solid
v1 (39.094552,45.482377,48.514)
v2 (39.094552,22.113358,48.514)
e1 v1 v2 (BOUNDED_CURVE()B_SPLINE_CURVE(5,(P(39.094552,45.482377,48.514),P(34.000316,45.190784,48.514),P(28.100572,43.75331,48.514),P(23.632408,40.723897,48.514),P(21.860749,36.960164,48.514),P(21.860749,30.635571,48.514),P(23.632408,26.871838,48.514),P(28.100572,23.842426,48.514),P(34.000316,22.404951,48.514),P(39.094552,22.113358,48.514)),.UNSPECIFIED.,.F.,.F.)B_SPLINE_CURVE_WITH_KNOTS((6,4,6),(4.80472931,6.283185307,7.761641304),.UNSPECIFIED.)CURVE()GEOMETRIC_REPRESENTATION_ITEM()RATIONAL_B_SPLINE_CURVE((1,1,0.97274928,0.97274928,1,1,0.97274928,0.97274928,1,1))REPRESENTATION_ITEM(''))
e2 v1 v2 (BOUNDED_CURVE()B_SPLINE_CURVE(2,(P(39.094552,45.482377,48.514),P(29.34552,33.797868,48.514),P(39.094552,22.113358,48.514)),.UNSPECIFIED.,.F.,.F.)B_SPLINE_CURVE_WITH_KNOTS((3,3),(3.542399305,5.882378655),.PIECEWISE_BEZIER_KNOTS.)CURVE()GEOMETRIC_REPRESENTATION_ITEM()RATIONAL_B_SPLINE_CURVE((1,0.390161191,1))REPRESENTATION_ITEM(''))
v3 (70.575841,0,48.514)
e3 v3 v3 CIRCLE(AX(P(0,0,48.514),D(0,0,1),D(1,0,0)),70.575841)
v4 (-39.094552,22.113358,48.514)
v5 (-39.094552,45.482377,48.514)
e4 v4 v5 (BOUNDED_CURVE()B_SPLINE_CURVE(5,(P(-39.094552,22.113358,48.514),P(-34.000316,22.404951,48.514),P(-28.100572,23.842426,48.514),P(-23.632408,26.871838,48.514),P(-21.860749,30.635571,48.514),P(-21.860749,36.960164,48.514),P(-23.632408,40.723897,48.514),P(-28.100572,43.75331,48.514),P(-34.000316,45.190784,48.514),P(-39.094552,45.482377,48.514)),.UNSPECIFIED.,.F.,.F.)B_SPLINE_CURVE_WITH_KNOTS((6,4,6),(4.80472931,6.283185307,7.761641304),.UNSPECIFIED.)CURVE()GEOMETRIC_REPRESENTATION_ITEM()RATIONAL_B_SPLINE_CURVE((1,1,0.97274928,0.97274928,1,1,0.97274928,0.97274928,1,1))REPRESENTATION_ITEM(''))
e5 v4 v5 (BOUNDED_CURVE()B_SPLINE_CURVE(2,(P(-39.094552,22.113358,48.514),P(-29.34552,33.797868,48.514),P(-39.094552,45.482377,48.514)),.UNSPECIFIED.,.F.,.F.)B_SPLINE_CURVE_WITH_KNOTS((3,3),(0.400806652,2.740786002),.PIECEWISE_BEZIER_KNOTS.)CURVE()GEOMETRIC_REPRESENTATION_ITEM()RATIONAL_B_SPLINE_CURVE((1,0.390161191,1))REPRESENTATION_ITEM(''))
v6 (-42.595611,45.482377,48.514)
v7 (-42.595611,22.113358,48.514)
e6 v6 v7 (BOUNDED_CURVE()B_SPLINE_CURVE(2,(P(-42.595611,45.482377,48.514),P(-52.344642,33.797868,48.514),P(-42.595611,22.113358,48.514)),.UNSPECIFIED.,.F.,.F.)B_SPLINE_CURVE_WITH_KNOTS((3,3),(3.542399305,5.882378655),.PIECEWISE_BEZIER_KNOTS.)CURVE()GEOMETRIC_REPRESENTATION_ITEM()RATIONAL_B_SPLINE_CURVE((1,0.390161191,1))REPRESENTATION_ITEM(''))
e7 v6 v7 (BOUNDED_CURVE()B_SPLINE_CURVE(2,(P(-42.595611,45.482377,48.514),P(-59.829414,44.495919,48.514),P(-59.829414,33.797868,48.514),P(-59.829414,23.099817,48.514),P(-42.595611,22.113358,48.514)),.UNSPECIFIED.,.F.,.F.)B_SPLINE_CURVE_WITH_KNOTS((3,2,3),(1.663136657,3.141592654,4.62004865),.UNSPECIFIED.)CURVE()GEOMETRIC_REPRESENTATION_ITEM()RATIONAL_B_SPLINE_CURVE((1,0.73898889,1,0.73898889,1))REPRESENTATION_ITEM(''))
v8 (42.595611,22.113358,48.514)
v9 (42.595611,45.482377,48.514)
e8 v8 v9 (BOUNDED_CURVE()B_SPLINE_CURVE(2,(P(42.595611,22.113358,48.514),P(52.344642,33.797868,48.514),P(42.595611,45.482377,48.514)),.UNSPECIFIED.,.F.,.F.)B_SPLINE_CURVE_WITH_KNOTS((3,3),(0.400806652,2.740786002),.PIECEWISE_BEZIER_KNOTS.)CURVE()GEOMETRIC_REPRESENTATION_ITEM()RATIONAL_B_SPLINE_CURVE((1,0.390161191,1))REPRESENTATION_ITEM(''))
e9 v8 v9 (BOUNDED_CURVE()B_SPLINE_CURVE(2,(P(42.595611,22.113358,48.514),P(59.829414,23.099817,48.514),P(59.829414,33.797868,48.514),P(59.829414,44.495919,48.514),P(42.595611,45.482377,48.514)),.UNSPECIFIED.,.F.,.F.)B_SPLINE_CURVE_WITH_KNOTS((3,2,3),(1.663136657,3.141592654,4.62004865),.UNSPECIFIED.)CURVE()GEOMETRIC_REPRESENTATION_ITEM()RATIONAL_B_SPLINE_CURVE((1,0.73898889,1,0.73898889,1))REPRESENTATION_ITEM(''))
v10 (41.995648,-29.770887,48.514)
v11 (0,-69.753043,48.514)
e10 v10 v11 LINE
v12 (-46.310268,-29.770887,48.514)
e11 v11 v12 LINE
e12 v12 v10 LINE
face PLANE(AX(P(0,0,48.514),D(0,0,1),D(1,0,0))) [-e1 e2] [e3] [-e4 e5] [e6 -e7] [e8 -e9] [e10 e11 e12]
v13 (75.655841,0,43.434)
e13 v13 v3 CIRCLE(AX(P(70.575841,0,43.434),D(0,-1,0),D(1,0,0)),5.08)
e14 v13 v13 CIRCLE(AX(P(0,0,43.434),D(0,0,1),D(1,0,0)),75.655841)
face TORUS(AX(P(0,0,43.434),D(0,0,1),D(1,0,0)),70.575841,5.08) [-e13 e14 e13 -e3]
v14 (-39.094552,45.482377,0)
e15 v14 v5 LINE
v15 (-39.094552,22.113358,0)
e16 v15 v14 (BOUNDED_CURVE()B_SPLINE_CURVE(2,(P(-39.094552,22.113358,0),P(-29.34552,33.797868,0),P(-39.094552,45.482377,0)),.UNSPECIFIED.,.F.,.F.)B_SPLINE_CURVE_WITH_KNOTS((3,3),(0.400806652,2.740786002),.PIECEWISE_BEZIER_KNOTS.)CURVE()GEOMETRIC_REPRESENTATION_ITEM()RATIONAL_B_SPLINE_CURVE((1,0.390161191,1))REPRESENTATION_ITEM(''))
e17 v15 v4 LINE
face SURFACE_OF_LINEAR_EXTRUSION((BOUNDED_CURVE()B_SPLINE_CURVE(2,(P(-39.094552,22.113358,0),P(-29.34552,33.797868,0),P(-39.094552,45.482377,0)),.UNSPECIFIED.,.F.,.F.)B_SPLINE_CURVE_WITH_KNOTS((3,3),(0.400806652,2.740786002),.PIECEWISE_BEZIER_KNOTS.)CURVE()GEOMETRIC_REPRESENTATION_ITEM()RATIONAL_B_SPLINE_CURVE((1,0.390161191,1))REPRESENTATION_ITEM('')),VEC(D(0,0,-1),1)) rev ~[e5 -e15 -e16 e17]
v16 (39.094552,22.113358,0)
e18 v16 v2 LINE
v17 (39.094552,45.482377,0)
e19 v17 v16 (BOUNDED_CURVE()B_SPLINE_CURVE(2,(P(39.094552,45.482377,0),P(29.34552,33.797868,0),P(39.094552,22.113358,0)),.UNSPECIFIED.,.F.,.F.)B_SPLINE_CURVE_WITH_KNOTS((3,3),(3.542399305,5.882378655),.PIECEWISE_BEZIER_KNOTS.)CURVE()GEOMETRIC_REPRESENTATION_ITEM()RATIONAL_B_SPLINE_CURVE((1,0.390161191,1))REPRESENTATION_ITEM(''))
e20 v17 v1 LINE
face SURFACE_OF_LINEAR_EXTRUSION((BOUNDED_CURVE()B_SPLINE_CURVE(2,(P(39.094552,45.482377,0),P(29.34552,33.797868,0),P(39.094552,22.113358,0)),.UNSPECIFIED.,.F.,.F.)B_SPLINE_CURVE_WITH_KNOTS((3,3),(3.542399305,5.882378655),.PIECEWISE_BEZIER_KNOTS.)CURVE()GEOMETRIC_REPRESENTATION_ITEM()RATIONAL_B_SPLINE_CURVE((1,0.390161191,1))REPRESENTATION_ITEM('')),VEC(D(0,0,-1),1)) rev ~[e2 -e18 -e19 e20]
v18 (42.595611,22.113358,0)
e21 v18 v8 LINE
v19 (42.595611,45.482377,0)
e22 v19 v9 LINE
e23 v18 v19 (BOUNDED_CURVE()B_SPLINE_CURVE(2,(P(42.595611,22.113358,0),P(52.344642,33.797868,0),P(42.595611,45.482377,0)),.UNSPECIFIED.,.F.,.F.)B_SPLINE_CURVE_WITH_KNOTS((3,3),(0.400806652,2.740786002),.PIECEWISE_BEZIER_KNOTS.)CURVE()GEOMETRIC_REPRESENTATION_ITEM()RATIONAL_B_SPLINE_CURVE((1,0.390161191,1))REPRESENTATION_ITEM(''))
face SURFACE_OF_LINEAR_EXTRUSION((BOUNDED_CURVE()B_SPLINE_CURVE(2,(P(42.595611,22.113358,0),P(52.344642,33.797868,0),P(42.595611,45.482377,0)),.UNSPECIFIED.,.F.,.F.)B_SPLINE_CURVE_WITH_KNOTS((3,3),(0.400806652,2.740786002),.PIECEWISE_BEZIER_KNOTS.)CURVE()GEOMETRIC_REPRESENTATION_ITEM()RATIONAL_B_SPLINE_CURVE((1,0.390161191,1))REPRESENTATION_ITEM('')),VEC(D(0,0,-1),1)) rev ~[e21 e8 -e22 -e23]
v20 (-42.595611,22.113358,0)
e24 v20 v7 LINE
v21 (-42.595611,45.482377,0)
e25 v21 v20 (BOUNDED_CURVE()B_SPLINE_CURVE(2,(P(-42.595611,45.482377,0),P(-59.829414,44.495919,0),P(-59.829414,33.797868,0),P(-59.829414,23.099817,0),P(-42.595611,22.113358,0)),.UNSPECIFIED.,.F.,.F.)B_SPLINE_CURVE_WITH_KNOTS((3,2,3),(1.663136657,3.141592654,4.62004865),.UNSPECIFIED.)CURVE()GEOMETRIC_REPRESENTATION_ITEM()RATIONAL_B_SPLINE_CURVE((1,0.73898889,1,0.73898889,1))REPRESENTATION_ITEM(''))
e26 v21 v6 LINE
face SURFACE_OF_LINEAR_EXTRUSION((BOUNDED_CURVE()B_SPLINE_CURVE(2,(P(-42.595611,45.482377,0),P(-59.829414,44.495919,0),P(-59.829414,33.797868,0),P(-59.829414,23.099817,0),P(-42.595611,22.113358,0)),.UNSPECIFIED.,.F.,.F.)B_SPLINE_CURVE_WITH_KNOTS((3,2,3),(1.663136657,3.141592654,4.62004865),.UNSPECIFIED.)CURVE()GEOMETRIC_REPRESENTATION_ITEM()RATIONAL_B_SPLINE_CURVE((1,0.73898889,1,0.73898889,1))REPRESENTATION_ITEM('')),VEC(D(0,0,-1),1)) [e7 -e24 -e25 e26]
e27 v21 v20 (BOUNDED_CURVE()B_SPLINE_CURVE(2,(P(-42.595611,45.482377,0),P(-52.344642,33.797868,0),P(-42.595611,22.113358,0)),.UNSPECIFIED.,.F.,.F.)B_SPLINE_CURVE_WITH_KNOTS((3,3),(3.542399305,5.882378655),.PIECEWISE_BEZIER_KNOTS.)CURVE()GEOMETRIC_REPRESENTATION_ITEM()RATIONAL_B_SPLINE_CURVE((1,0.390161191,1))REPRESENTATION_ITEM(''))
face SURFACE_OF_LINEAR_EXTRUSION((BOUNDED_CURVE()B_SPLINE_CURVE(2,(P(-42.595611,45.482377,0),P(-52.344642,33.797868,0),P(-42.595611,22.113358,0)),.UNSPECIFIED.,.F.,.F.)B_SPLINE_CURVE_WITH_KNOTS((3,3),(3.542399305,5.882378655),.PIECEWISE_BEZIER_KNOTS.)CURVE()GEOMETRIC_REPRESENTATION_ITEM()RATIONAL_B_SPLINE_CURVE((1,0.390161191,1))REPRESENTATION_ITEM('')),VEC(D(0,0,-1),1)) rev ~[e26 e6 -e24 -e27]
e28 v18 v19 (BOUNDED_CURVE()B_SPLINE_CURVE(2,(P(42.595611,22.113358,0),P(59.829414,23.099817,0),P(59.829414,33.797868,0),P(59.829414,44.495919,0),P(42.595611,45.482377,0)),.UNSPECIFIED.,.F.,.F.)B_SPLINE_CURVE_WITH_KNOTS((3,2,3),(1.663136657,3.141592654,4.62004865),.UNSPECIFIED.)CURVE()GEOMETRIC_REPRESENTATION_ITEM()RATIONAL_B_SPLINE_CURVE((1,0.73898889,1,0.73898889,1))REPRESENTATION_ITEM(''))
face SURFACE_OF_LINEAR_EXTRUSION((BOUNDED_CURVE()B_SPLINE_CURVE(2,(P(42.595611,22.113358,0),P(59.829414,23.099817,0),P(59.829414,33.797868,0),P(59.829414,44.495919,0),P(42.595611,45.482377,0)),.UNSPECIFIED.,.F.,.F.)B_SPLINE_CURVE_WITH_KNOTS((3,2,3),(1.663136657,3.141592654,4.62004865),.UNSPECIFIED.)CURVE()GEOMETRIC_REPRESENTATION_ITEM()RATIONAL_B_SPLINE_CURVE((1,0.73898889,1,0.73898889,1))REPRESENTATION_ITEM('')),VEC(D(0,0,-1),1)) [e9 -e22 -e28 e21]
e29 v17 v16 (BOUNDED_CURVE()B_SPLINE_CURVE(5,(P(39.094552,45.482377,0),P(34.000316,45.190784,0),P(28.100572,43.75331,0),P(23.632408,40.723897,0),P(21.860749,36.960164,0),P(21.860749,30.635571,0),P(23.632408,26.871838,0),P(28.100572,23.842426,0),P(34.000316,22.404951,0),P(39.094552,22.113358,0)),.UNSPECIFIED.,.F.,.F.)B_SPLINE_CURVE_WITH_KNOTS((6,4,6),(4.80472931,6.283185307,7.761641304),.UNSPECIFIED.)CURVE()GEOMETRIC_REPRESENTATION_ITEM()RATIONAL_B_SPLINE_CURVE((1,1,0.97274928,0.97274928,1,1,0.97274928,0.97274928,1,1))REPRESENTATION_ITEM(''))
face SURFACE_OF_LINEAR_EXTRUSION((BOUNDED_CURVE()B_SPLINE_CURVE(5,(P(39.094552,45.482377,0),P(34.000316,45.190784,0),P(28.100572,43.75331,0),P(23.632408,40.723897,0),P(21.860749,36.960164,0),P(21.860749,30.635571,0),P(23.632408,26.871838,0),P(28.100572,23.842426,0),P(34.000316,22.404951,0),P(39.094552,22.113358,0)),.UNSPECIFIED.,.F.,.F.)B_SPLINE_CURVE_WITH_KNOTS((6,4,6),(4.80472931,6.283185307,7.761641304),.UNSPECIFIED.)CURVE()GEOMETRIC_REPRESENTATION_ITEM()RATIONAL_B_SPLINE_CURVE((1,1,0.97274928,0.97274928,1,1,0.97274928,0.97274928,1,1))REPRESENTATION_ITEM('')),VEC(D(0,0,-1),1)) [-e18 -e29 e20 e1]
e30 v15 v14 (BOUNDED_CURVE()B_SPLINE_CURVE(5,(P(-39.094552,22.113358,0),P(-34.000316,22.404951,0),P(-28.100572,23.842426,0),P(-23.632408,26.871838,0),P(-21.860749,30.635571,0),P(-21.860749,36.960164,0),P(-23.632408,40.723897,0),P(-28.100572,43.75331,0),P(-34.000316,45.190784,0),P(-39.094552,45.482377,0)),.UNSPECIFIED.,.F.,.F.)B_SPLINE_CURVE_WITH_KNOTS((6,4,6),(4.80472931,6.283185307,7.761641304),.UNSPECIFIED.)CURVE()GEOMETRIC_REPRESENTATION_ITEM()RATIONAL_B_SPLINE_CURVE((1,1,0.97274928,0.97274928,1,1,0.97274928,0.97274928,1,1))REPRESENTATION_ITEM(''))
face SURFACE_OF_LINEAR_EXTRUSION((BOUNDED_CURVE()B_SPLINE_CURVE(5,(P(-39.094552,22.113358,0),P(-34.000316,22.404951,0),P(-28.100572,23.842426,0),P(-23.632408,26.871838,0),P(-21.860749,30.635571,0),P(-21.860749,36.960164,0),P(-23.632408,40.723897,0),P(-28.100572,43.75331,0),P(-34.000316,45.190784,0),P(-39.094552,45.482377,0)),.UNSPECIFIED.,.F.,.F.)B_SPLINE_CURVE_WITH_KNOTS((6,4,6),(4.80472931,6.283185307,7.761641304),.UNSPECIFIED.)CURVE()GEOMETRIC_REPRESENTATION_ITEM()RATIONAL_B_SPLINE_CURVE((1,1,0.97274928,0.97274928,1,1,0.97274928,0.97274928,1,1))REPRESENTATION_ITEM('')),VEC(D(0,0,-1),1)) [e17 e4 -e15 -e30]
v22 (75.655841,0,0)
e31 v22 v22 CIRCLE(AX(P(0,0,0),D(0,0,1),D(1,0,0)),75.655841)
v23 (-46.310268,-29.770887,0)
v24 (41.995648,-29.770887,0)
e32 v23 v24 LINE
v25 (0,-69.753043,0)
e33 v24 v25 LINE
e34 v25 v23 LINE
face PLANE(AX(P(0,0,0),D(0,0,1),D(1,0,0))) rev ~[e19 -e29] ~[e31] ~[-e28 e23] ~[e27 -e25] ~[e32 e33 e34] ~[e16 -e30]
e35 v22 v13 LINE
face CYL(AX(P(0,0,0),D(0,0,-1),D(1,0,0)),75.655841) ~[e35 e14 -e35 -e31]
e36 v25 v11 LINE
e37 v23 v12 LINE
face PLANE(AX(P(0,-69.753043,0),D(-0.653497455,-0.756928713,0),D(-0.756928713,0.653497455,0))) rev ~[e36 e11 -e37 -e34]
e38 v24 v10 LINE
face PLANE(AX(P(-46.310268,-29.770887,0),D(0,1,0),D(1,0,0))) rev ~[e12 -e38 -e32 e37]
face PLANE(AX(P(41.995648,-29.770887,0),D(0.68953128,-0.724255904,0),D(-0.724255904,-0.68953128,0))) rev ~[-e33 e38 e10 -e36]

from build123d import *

# Parameters (mm, degrees)
F0_R     = 75.6558411923
F1_DEPTH = 48.514
F2_R     = 5.08


with BuildPart() as f1:
    # F0 (on Top) → F1 (new body)
    with BuildSketch(Plane.XY):
        Circle(F0_R)
        Polygon((0, -69.7530433536), (-46.3102683425, -29.7708865255), (41.9956482947, -29.7708865255), align=None, mode=Mode.SUBTRACT)
        with BuildLine():
            add(Edge.make_bspline(
                [(-21.8607485294, 33.7978675961), (-21.8607485294, 44.4959185344), (-39.0945518587, 45.4823768148)],
                knots=[0, 0, 0, 1.4784559967, 1.4784559967, 1.4784559967], degree=2, weights=[1, 0.73898889, 1]))
            add(Edge.make_bspline(
                [(-39.0945518587, 22.1133583775), (-21.8607485294, 23.0998166579), (-21.8607485294, 33.7978675961)],
                knots=[4.8047293104, 4.8047293104, 4.8047293104, 6.2831853072, 6.2831853072, 6.2831853072], degree=2, weights=[1, 0.73898889, 1]))
            add(Edge.make_bspline(
                [(-40.8450812101, 21.1076120934), (-39.9337015522, 21.1076120934), (-39.0945518587, 22.1133583775)],
                knots=[0, 0, 0, 0.4008066518, 0.4008066518, 0.4008066518], degree=2, weights=[1, 0.9799863696, 1]))
            add(Edge.make_bspline(
                [(-42.5956105616, 22.1133583775), (-41.7564608681, 21.1076120934), (-40.8450812101, 21.1076120934)],
                knots=[5.8823786554, 5.8823786554, 5.8823786554, 6.2831853072, 6.2831853072, 6.2831853072], degree=2, weights=[1, 0.9799863696, 1]))
            add(Edge.make_bspline(
                [(-42.5956105616, 45.4823768148), (-59.8294138908, 44.4959185344), (-59.8294138908, 33.7978675961), (-59.8294138908, 23.0998166579), (-42.5956105616, 22.1133583775)],
                knots=[1.6631366568, 1.6631366568, 1.6631366568, 3.1415926536, 3.1415926536, 4.6200486503, 4.6200486503, 4.6200486503], degree=2, weights=[1, 0.73898889, 1, 0.73898889, 1]))
            add(Edge.make_bspline(
                [(-39.0945518587, 45.4823768148), (-40.8450812101, 47.5804391797), (-42.5956105616, 45.4823768148)],
                knots=[2.7407860018, 2.7407860018, 2.7407860018, 3.5423993054, 3.5423993054, 3.5423993054], degree=2, weights=[1, 0.9207465694, 1]))
        make_face(mode=Mode.SUBTRACT)
        with BuildLine():
            add(Edge.make_bspline(
                [(21.8607485294, 33.7978675961), (21.8607485294, 23.0998166579), (39.0945518587, 22.1133583775)],
                knots=[0, 0, 0, 1.4784559967, 1.4784559967, 1.4784559967], degree=2, weights=[1, 0.73898889, 1]))
            add(Edge.make_bspline(
                [(39.0945518587, 45.4823768148), (21.8607485294, 44.4959185344), (21.8607485294, 33.7978675961)],
                knots=[4.8047293104, 4.8047293104, 4.8047293104, 6.2831853072, 6.2831853072, 6.2831853072], degree=2, weights=[1, 0.73898889, 1]))
            add(Edge.make_bspline(
                [(42.5956105616, 45.4823768148), (40.8450812101, 47.5804391797), (39.0945518587, 45.4823768148)],
                knots=[2.7407860018, 2.7407860018, 2.7407860018, 3.5423993054, 3.5423993054, 3.5423993054], degree=2, weights=[1, 0.9207465694, 1]))
            add(Edge.make_bspline(
                [(42.5956105616, 22.1133583775), (59.8294138908, 23.0998166579), (59.8294138908, 33.7978675961), (59.8294138908, 44.4959185344), (42.5956105616, 45.4823768148)],
                knots=[1.6631366568, 1.6631366568, 1.6631366568, 3.1415926536, 3.1415926536, 4.6200486503, 4.6200486503, 4.6200486503], degree=2, weights=[1, 0.73898889, 1, 0.73898889, 1]))
            add(Edge.make_bspline(
                [(40.8450812101, 21.1076120934), (41.7564608681, 21.1076120934), (42.5956105616, 22.1133583775)],
                knots=[0, 0, 0, 0.4008066518, 0.4008066518, 0.4008066518], degree=2, weights=[1, 0.9799863696, 1]))
            add(Edge.make_bspline(
                [(39.0945518587, 22.1133583775), (39.9337015522, 21.1076120934), (40.8450812101, 21.1076120934)],
                knots=[5.8823786554, 5.8823786554, 5.8823786554, 6.2831853072, 6.2831853072, 6.2831853072], degree=2, weights=[1, 0.9799863696, 1]))
        make_face(mode=Mode.SUBTRACT)
        with BuildLine():
            add(Edge.make_bspline(
                [(-39.0945518587, 22.1133583775), (-29.3455202344, 33.7978675961), (-39.0945518587, 45.4823768148)],
                knots=[0.4008066518, 0.4008066518, 0.4008066518, 2.7407860018, 2.7407860018, 2.7407860018], degree=2, weights=[1, 0.390161191, 1]))
            add(Edge.make_bspline(
                [(-39.0945518587, 45.4823768148), (-40.8450812101, 45.5825766454), (-42.5956105616, 45.4823768148)],
                knots=[1.4784559967, 1.4784559967, 1.4784559967, 1.6631366568, 1.6631366568, 1.6631366568], degree=2, weights=[1, 0.9957396602, 1]))
            add(Edge.make_bspline(
                [(-42.5956105616, 45.4823768148), (-52.3446421858, 33.7978675961), (-42.5956105616, 22.1133583775)],
                knots=[3.5423993054, 3.5423993054, 3.5423993054, 5.8823786554, 5.8823786554, 5.8823786554], degree=2, weights=[1, 0.390161191, 1]))
            add(Edge.make_bspline(
                [(-42.5956105616, 22.1133583775), (-40.8450812101, 22.0131585469), (-39.0945518587, 22.1133583775)],
                knots=[4.6200486503, 4.6200486503, 4.6200486503, 4.8047293104, 4.8047293104, 4.8047293104], degree=2, weights=[1, 0.9957396602, 1]))
        make_face()
        with BuildLine():
            add(Edge.make_bspline(
                [(-39.0945518587, 45.4823768148), (-40.8450812101, 45.5825766454), (-42.5956105616, 45.4823768148)],
                knots=[1.4784559967, 1.4784559967, 1.4784559967, 1.6631366568, 1.6631366568, 1.6631366568], degree=2, weights=[1, 0.9957396602, 1]))
            add(Edge.make_bspline(
                [(-39.0945518587, 45.4823768148), (-40.8450812101, 47.5804391797), (-42.5956105616, 45.4823768148)],
                knots=[2.7407860018, 2.7407860018, 2.7407860018, 3.5423993054, 3.5423993054, 3.5423993054], degree=2, weights=[1, 0.9207465694, 1]))
        make_face()
        with BuildLine():
            add(Edge.make_bspline(
                [(-40.8450812101, 21.1076120934), (-39.9337015522, 21.1076120934), (-39.0945518587, 22.1133583775)],
                knots=[0, 0, 0, 0.4008066518, 0.4008066518, 0.4008066518], degree=2, weights=[1, 0.9799863696, 1]))
            add(Edge.make_bspline(
                [(-42.5956105616, 22.1133583775), (-40.8450812101, 22.0131585469), (-39.0945518587, 22.1133583775)],
                knots=[4.6200486503, 4.6200486503, 4.6200486503, 4.8047293104, 4.8047293104, 4.8047293104], degree=2, weights=[1, 0.9957396602, 1]))
            add(Edge.make_bspline(
                [(-42.5956105616, 22.1133583775), (-41.7564608681, 21.1076120934), (-40.8450812101, 21.1076120934)],
                knots=[5.8823786554, 5.8823786554, 5.8823786554, 6.2831853072, 6.2831853072, 6.2831853072], degree=2, weights=[1, 0.9799863696, 1]))
        make_face()
        with BuildLine():
            add(Edge.make_bspline(
                [(39.0945518587, 45.4823768148), (29.3455202344, 33.7978675961), (39.0945518587, 22.1133583775)],
                knots=[3.5423993054, 3.5423993054, 3.5423993054, 5.8823786554, 5.8823786554, 5.8823786554], degree=2, weights=[1, 0.390161191, 1]))
            add(Edge.make_bspline(
                [(39.0945518587, 22.1133583775), (40.8450812101, 22.0131585469), (42.5956105616, 22.1133583775)],
                knots=[1.4784559967, 1.4784559967, 1.4784559967, 1.6631366568, 1.6631366568, 1.6631366568], degree=2, weights=[1, 0.9957396602, 1]))
            add(Edge.make_bspline(
                [(42.5956105616, 22.1133583775), (52.3446421858, 33.7978675961), (42.5956105616, 45.4823768148)],
                knots=[0.4008066518, 0.4008066518, 0.4008066518, 2.7407860018, 2.7407860018, 2.7407860018], degree=2, weights=[1, 0.390161191, 1]))
            add(Edge.make_bspline(
                [(42.5956105616, 45.4823768148), (40.8450812101, 45.5825766454), (39.0945518587, 45.4823768148)],
                knots=[4.6200486503, 4.6200486503, 4.6200486503, 4.8047293104, 4.8047293104, 4.8047293104], degree=2, weights=[1, 0.9957396602, 1]))
        make_face()
        with BuildLine():
            add(Edge.make_bspline(
                [(39.0945518587, 22.1133583775), (40.8450812101, 22.0131585469), (42.5956105616, 22.1133583775)],
                knots=[1.4784559967, 1.4784559967, 1.4784559967, 1.6631366568, 1.6631366568, 1.6631366568], degree=2, weights=[1, 0.9957396602, 1]))
            add(Edge.make_bspline(
                [(39.0945518587, 22.1133583775), (39.9337015522, 21.1076120934), (40.8450812101, 21.1076120934)],
                knots=[5.8823786554, 5.8823786554, 5.8823786554, 6.2831853072, 6.2831853072, 6.2831853072], degree=2, weights=[1, 0.9799863696, 1]))
            add(Edge.make_bspline(
                [(40.8450812101, 21.1076120934), (41.7564608681, 21.1076120934), (42.5956105616, 22.1133583775)],
                knots=[0, 0, 0, 0.4008066518, 0.4008066518, 0.4008066518], degree=2, weights=[1, 0.9799863696, 1]))
        make_face()
        with BuildLine():
            add(Edge.make_bspline(
                [(42.5956105616, 45.4823768148), (40.8450812101, 47.5804391797), (39.0945518587, 45.4823768148)],
                knots=[2.7407860018, 2.7407860018, 2.7407860018, 3.5423993054, 3.5423993054, 3.5423993054], degree=2, weights=[1, 0.9207465694, 1]))
            add(Edge.make_bspline(
                [(42.5956105616, 45.4823768148), (40.8450812101, 45.5825766454), (39.0945518587, 45.4823768148)],
                knots=[4.6200486503, 4.6200486503, 4.6200486503, 4.8047293104, 4.8047293104, 4.8047293104], degree=2, weights=[1, 0.9957396602, 1]))
        make_face()
    extrude(amount=F1_DEPTH)

    # F2
    f2_edges = [f1.edges().sort_by_distance(p)[0] for p in [
        (-75.655841, 0, 48.514),
    ]]
    fillet(f2_edges, radius=F2_R)


solid = f1.part
